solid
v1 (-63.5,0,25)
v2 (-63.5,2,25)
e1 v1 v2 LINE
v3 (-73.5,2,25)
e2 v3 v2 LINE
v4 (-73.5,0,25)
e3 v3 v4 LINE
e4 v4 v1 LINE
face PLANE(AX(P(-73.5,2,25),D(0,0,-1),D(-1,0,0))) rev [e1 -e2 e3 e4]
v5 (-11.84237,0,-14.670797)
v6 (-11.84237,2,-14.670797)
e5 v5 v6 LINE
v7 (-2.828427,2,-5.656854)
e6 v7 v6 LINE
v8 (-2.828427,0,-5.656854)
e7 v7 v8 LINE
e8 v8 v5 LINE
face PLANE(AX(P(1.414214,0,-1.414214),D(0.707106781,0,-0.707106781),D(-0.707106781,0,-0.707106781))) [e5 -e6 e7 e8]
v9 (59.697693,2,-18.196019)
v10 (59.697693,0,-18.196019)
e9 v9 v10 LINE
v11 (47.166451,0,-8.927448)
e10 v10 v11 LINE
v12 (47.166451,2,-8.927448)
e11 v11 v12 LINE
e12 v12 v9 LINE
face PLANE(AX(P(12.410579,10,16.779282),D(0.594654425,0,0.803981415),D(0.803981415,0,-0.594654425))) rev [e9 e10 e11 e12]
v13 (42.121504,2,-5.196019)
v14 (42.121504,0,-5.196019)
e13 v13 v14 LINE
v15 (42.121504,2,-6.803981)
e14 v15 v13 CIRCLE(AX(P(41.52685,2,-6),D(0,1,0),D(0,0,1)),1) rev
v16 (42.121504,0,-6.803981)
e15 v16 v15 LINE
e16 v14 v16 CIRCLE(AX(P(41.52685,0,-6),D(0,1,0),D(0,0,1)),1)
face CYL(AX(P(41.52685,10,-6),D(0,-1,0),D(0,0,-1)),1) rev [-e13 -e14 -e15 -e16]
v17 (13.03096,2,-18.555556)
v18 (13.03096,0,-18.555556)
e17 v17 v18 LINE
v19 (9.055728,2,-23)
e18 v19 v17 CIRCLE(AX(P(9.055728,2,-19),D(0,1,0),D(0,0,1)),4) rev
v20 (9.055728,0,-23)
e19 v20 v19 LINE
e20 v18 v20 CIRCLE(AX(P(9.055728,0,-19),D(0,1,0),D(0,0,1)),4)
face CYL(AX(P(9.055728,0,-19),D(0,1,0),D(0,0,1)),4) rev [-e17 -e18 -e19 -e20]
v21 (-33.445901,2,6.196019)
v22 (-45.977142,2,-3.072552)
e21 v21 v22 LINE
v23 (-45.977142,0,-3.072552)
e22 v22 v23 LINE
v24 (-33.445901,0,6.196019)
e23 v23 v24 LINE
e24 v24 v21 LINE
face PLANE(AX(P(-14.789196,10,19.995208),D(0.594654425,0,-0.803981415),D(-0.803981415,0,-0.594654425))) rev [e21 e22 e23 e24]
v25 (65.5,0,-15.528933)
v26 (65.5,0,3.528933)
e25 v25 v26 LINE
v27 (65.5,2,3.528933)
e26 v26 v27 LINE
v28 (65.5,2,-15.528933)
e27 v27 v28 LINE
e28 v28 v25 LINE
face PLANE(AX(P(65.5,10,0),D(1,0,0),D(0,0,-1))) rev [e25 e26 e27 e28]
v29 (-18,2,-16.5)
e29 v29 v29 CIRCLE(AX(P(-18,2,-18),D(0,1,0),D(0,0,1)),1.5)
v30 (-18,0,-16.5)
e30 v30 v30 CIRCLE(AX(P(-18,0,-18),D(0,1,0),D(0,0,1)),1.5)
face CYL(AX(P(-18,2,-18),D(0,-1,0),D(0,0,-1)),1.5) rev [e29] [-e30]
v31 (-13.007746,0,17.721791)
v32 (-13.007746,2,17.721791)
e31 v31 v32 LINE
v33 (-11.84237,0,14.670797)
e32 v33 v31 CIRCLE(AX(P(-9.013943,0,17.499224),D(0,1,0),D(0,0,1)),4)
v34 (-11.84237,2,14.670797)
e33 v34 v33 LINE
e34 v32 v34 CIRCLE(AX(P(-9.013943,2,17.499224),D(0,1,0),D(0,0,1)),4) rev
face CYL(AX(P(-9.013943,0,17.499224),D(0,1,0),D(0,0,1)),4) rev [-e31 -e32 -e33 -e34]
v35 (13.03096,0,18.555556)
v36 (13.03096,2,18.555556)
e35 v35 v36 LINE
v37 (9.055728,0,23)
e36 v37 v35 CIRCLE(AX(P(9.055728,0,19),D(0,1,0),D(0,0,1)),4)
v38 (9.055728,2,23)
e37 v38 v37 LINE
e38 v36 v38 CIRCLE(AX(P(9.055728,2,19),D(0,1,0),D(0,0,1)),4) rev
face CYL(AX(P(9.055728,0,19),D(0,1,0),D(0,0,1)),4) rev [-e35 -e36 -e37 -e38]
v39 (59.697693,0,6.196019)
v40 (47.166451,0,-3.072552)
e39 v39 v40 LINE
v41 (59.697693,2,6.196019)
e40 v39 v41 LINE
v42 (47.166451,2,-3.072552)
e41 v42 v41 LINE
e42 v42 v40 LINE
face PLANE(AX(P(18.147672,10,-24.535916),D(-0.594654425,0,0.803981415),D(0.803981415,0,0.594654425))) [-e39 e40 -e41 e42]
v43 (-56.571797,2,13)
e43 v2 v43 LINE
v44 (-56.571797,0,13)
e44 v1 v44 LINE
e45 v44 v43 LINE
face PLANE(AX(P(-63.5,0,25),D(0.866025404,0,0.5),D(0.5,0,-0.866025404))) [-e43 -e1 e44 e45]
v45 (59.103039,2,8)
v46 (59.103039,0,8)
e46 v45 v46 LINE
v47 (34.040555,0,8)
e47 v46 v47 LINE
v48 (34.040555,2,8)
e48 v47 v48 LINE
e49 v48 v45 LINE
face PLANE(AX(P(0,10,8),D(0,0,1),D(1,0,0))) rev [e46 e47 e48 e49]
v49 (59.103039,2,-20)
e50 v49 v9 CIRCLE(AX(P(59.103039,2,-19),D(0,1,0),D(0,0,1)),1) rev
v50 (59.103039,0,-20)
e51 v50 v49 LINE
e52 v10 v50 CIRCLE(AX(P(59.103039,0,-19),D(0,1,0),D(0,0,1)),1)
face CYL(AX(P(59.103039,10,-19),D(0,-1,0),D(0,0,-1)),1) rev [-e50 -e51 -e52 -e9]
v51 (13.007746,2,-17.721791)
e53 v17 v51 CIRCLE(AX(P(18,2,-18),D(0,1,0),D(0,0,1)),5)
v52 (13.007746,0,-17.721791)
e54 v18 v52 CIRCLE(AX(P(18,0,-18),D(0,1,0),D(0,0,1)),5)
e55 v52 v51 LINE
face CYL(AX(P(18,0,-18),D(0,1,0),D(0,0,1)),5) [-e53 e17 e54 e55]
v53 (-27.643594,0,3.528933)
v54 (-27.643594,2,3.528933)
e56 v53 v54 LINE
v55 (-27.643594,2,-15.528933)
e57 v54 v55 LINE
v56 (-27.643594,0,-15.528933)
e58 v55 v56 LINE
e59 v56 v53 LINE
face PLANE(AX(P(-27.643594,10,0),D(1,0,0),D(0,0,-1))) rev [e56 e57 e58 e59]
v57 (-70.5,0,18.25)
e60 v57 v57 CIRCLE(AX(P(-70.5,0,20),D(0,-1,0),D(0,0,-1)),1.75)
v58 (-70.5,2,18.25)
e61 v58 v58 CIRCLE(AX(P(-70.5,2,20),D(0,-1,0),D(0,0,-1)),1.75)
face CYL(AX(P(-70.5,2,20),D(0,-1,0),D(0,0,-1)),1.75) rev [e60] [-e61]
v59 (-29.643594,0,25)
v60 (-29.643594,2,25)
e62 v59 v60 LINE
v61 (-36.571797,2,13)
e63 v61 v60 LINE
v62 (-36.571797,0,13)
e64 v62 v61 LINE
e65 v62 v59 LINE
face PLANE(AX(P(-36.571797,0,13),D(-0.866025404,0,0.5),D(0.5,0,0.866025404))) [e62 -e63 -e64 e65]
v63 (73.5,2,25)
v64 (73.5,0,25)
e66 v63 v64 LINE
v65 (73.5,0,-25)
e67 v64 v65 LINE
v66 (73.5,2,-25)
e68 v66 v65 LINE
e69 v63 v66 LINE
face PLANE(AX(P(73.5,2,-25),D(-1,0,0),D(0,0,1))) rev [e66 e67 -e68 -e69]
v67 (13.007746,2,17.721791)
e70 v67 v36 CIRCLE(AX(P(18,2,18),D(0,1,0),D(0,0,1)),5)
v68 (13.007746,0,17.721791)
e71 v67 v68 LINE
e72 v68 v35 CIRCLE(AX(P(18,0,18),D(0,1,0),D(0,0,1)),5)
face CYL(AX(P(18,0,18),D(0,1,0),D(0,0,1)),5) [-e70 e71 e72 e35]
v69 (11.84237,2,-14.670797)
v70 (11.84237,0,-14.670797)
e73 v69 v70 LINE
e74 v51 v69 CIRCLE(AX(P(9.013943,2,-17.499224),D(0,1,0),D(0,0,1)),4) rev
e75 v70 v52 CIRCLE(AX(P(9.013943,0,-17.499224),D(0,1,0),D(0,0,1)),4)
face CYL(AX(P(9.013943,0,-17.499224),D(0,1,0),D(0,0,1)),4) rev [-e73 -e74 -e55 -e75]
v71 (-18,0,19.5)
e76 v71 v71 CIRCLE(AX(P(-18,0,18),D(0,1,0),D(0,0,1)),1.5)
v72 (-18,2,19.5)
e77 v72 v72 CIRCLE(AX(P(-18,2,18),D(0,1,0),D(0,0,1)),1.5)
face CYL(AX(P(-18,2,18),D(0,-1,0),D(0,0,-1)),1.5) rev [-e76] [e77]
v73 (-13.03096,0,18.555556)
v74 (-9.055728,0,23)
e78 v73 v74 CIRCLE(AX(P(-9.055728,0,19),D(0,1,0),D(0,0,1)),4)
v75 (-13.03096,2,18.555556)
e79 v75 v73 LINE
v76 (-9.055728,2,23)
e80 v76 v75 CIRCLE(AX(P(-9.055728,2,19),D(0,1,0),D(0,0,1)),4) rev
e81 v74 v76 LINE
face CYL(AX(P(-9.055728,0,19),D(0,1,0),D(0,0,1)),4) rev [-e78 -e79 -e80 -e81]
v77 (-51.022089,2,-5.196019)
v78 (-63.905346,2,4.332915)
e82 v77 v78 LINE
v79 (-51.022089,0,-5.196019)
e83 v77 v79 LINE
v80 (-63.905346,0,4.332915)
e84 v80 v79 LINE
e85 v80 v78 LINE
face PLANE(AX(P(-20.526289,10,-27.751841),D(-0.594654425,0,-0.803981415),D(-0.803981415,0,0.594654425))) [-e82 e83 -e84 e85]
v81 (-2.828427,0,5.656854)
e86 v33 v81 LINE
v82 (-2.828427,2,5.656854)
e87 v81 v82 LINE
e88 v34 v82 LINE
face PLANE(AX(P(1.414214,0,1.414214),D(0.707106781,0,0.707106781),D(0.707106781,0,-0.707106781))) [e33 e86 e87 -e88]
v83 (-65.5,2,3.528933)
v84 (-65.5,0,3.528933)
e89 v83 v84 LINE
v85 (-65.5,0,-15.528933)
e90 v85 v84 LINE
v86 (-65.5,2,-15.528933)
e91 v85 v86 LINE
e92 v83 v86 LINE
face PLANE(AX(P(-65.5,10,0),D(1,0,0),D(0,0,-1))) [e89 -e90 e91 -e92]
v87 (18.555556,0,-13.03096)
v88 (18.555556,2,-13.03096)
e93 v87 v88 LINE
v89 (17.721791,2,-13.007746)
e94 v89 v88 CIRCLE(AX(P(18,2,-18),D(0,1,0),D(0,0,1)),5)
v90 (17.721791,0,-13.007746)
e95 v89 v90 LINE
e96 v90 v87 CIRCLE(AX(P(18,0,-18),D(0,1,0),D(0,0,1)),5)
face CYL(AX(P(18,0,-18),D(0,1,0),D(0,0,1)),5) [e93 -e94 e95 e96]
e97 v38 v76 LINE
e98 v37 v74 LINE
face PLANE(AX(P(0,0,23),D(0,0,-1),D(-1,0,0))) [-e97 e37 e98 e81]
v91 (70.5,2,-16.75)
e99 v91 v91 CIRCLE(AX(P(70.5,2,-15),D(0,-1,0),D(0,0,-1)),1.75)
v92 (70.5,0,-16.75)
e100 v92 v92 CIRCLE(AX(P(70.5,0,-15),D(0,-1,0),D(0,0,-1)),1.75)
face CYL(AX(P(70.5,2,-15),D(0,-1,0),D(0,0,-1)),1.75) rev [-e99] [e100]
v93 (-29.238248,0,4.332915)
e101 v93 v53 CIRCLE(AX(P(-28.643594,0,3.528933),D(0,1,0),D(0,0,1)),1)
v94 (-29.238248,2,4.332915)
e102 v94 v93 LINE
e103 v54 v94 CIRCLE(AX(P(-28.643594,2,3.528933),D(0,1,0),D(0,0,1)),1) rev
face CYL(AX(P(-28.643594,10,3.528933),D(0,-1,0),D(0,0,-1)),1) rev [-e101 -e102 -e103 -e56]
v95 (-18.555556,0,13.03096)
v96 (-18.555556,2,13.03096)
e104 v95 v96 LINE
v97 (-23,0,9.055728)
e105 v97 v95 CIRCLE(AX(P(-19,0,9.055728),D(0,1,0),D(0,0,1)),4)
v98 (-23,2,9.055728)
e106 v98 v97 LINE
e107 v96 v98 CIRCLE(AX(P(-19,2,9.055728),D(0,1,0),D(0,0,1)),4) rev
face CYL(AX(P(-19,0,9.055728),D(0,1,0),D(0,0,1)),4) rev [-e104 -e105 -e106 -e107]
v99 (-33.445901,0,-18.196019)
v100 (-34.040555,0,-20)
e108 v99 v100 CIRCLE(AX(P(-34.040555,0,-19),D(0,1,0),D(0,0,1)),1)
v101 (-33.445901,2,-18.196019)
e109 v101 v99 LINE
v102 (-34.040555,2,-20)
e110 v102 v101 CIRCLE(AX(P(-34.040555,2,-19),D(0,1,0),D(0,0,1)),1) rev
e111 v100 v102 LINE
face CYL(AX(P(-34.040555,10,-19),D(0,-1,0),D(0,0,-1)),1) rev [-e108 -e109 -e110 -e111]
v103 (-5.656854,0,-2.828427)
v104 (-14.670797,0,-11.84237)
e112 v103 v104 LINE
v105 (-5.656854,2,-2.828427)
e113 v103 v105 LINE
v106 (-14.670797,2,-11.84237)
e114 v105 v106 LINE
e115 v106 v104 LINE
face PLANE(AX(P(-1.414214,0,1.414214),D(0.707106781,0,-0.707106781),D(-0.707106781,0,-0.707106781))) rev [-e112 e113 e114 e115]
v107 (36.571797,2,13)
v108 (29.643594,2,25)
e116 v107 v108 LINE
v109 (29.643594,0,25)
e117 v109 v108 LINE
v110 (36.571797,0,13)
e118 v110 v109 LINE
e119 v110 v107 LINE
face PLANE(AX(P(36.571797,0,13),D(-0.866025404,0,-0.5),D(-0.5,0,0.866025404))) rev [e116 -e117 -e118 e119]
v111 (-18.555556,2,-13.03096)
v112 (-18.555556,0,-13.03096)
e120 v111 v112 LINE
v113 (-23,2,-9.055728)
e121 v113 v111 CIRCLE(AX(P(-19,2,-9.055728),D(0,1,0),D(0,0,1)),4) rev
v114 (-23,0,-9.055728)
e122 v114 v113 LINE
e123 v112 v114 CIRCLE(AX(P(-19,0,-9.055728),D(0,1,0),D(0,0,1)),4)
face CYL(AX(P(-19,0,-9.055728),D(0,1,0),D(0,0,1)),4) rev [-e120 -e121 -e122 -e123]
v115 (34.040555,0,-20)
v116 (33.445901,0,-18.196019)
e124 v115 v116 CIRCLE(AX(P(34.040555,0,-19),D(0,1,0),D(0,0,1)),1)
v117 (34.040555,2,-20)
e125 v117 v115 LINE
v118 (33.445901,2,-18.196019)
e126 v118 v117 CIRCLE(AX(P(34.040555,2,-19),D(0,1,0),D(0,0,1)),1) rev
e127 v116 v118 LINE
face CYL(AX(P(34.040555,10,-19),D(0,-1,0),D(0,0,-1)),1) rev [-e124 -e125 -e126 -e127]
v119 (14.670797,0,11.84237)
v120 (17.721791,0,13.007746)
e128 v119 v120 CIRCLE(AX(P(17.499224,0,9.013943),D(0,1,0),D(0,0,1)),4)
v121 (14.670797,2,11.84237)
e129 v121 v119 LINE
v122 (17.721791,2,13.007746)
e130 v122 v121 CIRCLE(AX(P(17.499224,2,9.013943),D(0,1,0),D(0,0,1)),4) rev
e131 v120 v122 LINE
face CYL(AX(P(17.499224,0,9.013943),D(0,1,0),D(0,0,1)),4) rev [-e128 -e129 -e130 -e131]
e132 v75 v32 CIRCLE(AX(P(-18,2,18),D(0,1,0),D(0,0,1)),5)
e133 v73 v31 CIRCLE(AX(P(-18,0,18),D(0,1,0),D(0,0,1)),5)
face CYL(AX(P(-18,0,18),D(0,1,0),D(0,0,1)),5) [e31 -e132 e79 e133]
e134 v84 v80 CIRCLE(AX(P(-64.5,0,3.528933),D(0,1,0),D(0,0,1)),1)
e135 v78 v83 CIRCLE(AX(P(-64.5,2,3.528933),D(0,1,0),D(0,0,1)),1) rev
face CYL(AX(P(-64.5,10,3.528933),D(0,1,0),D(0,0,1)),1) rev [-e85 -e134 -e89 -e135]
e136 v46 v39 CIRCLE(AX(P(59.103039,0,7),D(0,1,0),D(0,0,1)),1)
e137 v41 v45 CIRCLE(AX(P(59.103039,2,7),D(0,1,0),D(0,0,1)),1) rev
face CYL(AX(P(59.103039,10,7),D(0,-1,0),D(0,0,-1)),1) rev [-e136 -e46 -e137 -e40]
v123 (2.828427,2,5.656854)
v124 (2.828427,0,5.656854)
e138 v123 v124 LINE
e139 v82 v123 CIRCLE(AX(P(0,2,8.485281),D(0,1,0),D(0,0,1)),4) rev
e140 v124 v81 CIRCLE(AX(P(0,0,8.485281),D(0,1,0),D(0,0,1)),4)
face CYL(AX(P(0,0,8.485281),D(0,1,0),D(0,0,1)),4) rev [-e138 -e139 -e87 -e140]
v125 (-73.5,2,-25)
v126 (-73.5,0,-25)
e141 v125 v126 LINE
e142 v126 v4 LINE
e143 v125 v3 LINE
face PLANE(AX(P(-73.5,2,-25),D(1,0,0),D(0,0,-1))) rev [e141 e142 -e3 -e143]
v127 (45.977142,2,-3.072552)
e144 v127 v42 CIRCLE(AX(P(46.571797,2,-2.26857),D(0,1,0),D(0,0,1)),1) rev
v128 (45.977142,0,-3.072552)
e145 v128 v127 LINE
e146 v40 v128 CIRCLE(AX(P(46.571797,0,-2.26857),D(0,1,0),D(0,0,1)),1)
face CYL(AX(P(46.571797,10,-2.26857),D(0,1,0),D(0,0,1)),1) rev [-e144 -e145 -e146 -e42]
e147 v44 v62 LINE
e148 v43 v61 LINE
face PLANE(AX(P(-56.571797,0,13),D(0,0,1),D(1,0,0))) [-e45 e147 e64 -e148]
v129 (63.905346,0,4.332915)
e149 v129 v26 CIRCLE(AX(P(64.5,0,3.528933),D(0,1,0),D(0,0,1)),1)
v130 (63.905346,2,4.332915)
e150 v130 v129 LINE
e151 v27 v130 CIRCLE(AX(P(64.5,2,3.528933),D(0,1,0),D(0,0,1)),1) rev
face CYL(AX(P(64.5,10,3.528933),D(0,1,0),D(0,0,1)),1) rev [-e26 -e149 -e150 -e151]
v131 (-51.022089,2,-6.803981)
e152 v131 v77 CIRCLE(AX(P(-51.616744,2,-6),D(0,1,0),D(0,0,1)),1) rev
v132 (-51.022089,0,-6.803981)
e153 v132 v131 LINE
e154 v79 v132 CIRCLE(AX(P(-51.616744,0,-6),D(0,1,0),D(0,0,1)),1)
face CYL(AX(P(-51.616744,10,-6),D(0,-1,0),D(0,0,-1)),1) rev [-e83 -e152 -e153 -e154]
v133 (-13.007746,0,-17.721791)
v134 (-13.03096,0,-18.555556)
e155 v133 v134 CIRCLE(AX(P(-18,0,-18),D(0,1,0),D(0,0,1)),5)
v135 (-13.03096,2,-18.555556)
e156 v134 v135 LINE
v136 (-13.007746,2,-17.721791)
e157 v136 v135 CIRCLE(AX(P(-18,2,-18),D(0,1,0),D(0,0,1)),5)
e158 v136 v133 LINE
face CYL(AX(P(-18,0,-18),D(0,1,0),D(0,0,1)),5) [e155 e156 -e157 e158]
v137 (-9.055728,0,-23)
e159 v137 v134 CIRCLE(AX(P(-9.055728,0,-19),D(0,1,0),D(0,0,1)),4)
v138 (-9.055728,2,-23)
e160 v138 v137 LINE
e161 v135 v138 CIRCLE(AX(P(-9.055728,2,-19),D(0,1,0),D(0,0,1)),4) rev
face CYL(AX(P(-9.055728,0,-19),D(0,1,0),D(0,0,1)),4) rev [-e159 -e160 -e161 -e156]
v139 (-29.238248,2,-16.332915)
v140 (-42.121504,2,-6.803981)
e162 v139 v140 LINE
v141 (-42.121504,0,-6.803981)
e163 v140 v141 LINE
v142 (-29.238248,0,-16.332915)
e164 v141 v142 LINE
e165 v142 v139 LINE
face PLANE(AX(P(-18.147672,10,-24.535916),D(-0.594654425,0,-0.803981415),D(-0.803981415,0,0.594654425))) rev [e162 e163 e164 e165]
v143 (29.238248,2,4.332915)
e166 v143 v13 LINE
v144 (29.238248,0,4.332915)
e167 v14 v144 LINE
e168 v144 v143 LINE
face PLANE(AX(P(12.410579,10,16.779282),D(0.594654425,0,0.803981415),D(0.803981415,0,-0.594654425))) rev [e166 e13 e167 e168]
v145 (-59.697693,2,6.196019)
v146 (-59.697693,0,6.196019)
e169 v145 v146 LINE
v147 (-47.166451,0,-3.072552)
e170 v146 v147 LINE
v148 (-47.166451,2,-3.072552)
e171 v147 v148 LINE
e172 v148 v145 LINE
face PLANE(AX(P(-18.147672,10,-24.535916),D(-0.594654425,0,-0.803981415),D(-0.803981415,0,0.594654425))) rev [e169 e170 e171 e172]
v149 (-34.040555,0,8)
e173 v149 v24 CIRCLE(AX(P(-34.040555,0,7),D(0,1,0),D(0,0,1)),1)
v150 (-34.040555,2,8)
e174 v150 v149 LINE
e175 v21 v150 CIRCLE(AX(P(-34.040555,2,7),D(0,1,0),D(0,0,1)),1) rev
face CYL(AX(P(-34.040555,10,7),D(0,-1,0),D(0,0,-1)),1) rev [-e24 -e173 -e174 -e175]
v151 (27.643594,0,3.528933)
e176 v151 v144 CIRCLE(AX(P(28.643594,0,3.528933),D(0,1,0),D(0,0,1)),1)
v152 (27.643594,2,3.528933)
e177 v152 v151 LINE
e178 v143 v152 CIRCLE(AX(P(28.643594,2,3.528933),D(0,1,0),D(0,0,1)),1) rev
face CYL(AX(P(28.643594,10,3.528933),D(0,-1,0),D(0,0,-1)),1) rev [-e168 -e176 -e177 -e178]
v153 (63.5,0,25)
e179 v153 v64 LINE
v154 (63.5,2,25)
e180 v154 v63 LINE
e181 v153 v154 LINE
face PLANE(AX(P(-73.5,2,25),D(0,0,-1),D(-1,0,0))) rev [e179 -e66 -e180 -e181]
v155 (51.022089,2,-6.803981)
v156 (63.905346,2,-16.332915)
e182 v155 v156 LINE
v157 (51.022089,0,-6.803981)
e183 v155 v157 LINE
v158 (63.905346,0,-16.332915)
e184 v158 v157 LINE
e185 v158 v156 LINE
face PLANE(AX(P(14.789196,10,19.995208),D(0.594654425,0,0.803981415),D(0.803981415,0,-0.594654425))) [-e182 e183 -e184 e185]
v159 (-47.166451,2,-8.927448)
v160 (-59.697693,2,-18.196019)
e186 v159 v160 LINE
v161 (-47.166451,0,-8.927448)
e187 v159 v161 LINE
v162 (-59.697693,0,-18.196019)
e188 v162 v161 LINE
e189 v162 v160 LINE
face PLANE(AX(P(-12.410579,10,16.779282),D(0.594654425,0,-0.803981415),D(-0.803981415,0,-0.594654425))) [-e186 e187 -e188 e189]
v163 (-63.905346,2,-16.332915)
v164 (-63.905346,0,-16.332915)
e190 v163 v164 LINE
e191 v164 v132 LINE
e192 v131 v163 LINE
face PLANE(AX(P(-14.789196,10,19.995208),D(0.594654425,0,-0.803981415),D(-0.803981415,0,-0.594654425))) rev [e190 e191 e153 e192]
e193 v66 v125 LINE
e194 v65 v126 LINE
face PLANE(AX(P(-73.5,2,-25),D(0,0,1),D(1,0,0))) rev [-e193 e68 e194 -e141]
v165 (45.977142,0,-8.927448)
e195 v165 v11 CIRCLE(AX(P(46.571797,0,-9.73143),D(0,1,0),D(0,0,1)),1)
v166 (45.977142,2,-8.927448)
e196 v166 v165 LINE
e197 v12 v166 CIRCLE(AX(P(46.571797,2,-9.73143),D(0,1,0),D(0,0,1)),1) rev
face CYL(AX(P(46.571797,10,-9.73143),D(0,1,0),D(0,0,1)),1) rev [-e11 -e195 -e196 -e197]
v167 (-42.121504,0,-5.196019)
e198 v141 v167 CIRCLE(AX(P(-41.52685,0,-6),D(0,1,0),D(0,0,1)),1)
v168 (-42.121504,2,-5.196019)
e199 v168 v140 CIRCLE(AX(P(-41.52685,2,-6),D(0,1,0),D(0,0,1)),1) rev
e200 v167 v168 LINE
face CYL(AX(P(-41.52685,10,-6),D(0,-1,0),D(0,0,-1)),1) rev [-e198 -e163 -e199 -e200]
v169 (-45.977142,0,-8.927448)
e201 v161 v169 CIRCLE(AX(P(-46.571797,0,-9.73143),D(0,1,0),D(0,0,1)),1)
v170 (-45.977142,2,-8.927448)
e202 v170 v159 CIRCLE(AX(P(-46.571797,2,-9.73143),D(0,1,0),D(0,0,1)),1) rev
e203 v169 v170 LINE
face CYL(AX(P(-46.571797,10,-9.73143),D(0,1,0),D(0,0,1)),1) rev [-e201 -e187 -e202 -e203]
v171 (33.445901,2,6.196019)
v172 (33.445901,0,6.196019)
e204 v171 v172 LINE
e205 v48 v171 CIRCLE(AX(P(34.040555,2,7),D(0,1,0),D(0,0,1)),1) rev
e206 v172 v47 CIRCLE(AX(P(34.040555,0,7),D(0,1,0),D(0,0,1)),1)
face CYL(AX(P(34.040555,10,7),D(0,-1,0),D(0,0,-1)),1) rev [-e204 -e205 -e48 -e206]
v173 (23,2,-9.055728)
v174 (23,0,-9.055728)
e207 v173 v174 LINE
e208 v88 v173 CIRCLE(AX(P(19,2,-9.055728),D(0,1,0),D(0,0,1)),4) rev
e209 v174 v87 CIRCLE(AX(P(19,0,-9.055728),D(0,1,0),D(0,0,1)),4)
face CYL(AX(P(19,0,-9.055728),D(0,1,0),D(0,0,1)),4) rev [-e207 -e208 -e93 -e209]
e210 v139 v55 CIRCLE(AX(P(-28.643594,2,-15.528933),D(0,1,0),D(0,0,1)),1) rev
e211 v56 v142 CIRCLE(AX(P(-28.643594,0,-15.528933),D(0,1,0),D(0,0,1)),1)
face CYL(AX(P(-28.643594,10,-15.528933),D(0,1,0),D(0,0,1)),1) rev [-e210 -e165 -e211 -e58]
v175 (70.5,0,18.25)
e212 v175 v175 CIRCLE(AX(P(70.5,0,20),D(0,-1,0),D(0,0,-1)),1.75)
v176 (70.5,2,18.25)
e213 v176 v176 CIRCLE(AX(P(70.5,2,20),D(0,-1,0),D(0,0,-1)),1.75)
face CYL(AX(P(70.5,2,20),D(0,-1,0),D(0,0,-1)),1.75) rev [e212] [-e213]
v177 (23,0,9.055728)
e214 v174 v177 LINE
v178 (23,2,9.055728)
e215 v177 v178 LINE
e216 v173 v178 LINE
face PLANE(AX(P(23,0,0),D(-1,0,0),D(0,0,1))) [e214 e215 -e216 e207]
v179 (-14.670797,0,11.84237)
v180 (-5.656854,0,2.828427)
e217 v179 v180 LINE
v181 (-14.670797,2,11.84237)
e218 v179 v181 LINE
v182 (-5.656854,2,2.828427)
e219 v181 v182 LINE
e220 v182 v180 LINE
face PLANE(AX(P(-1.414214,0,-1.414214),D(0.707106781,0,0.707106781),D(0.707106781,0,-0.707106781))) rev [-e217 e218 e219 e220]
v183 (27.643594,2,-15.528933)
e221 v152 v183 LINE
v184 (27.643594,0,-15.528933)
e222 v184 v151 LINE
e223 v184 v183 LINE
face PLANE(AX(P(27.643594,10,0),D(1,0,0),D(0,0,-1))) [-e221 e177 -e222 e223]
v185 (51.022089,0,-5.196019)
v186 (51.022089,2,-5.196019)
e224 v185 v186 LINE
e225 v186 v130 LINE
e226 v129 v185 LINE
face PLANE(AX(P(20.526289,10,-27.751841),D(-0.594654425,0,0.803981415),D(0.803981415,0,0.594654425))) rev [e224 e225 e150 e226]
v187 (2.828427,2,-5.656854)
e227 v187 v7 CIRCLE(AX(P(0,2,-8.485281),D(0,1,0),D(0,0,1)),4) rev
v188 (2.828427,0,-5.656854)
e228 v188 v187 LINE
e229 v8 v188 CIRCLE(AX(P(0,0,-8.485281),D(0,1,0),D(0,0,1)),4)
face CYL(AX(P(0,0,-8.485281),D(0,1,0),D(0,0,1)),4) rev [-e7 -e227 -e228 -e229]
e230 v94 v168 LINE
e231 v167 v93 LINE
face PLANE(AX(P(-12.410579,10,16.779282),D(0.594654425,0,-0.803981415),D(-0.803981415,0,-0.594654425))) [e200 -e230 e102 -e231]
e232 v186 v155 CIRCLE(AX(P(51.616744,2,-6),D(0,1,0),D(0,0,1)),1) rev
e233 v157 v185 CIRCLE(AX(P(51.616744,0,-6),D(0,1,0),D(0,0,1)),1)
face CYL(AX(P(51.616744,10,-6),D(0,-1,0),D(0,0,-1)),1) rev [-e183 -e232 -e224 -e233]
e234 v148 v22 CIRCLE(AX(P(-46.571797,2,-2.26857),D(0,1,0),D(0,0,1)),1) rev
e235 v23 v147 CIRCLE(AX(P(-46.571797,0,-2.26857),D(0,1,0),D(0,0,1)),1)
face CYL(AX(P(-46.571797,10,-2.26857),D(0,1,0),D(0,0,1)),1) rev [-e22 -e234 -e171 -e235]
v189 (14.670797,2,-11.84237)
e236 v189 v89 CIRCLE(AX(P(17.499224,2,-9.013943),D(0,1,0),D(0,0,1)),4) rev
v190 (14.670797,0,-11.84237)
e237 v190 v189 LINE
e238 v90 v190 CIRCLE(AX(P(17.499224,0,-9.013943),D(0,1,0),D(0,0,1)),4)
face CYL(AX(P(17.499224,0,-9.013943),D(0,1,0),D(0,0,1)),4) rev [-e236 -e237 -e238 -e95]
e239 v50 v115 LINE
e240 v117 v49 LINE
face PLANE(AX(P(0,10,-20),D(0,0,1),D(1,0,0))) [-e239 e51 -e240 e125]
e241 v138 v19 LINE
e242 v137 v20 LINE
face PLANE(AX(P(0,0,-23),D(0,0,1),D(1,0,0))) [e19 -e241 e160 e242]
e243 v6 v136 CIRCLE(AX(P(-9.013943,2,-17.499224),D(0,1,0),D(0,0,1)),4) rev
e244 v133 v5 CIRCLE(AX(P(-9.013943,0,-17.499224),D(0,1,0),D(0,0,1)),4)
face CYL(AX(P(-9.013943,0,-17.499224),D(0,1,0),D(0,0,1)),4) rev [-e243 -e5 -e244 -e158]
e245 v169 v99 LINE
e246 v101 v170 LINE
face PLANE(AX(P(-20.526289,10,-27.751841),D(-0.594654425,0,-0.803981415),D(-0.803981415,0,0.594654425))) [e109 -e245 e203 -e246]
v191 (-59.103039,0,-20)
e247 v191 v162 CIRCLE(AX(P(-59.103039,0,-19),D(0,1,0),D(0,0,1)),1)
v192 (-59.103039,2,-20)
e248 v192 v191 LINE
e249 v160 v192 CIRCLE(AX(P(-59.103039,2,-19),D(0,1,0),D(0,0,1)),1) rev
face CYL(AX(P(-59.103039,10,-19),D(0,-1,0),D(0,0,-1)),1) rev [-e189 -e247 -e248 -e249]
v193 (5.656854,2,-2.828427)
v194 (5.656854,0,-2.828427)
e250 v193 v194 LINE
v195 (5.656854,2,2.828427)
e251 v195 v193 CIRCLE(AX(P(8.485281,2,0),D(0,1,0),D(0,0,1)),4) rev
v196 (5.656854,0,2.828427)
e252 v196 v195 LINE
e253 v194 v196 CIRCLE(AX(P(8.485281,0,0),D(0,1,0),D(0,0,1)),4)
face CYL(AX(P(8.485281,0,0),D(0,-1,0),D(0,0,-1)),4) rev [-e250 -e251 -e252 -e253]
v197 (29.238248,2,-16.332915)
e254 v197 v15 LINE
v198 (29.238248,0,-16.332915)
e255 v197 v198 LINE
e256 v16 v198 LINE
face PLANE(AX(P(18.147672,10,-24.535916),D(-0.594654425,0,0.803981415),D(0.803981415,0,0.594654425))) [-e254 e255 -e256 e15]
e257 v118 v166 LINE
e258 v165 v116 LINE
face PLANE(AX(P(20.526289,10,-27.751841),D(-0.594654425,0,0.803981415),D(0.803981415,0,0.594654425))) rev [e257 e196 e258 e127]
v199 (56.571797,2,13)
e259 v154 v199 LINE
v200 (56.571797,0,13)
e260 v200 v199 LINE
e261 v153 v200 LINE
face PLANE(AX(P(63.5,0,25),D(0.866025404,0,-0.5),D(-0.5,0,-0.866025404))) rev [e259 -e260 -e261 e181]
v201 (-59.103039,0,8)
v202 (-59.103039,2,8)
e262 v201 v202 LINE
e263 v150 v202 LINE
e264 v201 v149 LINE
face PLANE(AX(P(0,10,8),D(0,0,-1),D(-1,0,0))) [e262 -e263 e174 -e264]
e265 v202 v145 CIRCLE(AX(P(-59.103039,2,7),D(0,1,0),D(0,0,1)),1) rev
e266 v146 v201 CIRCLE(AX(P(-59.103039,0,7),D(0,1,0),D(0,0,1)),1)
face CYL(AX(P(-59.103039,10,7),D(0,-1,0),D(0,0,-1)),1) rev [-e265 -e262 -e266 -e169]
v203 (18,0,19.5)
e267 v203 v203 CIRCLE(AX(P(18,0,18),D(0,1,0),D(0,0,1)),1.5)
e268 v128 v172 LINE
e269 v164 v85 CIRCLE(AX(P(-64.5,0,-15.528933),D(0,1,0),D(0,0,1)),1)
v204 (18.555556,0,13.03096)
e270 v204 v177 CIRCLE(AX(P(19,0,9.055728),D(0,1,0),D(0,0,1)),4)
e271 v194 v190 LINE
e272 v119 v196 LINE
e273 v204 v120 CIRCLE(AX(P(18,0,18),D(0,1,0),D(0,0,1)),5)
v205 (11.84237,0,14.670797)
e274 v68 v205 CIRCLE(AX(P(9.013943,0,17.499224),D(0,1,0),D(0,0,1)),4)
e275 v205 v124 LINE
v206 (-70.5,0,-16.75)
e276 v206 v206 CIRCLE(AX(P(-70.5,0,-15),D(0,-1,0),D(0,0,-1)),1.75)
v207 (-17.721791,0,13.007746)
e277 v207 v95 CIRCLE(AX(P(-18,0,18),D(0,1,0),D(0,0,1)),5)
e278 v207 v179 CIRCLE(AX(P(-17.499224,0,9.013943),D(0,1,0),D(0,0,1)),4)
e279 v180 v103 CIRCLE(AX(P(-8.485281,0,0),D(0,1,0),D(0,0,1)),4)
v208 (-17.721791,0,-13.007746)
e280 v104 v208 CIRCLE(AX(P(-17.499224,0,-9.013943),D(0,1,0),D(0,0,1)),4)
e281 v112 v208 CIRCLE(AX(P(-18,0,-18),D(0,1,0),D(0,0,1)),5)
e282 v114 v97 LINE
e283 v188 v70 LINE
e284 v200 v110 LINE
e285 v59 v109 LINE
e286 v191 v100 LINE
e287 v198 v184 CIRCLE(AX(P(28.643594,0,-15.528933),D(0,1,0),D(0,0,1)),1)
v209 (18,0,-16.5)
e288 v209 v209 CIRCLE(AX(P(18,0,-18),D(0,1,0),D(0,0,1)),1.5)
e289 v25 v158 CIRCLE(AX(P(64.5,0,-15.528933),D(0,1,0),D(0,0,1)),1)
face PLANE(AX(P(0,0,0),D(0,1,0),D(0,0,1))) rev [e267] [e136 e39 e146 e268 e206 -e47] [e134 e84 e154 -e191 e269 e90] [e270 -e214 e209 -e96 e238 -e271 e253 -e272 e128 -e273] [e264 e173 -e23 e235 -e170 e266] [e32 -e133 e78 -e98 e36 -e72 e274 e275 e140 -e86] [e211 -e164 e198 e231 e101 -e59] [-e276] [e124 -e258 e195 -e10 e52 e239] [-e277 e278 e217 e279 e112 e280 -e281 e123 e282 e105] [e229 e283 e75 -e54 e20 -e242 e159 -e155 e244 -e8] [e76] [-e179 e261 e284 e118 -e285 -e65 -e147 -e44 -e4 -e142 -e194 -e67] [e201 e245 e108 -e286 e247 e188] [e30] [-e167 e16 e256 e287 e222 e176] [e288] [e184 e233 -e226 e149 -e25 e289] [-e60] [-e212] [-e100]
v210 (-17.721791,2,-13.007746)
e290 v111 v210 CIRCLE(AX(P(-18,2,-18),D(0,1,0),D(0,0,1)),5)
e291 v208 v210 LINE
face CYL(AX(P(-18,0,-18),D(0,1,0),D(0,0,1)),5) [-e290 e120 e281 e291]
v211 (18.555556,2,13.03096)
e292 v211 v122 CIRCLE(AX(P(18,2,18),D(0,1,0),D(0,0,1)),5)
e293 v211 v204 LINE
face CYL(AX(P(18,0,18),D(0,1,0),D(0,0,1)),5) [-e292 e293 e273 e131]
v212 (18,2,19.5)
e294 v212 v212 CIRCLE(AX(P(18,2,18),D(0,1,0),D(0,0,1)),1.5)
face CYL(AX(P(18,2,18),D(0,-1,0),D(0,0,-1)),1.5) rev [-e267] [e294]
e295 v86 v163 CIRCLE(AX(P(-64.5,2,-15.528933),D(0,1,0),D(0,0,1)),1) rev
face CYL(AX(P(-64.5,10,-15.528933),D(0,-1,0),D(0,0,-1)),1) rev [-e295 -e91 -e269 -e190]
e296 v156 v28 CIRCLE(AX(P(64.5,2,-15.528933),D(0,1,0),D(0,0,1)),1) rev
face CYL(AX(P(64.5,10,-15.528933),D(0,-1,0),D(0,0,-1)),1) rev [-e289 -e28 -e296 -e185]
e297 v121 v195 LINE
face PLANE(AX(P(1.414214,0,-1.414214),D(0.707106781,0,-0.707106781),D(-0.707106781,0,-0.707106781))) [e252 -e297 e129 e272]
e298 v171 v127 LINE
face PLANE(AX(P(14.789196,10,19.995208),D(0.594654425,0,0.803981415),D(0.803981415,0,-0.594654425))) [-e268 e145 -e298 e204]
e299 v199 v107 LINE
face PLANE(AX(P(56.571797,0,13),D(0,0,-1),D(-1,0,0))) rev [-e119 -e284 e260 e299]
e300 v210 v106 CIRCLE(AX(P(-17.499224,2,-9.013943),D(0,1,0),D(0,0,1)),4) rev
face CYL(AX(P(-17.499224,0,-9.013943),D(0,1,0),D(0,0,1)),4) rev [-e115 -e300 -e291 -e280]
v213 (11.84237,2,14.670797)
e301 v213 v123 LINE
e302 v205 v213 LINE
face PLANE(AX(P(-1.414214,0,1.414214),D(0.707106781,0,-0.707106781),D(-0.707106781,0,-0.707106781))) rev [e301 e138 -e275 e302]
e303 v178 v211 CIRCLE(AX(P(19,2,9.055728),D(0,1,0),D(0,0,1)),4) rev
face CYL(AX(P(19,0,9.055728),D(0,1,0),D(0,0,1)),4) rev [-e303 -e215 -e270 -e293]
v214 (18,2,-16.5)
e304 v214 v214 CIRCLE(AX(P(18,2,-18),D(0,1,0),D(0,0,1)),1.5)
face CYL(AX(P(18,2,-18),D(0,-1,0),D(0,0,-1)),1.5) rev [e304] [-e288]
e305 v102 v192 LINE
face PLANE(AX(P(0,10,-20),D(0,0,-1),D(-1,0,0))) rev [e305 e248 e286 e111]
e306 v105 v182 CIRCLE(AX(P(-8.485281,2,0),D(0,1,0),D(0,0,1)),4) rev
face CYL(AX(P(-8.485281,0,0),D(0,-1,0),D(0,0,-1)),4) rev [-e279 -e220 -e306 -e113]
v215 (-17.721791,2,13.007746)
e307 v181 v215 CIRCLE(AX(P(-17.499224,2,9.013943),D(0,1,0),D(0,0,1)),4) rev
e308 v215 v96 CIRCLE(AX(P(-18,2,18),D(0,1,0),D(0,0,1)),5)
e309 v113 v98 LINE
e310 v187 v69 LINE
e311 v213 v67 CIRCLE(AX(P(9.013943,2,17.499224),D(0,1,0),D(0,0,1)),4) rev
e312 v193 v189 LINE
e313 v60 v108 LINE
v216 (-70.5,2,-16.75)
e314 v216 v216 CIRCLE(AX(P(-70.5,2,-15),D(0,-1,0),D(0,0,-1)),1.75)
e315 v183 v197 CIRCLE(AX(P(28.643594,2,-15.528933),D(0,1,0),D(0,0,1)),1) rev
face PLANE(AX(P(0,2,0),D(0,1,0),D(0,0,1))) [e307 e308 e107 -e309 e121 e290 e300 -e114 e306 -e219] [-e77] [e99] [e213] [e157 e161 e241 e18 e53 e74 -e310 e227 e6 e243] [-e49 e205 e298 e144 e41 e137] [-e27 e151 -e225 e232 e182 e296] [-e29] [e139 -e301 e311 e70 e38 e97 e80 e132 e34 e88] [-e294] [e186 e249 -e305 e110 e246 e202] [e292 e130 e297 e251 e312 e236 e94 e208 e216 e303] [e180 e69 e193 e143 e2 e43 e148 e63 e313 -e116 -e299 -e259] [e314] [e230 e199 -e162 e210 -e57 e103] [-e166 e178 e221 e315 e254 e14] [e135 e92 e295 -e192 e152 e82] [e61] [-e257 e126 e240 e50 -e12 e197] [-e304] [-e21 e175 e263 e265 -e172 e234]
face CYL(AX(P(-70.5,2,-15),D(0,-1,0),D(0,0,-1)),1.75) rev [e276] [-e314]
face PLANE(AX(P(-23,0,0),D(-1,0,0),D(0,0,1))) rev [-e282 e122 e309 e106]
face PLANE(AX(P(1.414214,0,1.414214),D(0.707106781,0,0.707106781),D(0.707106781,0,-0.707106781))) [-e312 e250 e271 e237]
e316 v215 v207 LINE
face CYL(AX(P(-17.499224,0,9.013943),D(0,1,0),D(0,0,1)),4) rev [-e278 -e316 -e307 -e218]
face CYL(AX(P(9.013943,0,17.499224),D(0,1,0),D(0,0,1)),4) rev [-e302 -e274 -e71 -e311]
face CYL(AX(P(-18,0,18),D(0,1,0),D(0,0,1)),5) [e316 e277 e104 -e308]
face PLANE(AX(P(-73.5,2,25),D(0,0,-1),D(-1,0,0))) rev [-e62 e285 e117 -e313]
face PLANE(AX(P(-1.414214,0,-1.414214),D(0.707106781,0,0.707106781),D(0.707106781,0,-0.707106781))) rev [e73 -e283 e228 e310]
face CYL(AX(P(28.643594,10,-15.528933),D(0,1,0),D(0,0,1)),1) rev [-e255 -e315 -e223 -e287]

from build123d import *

# Parameters (mm, degrees)
SKETCH_1_W          = 147
SKETCH_1_H          = 50
SKETCH_1_R          = 1.5
EXTRUDE_1_DEPTH     = 2
CUT_EXTRUDE_1_DEPTH = 2
FILLET_2_DEPTH      = 2
FILLET_3_R          = 4
CUT_EXTRUDE_3_DEPTH = 78.661122835
SKETCH_7_R          = 1.75
CUT_EXTRUDE_4_DEPTH = 78.661122835
CUT_EXTRUDE_5_DEPTH = 10
FILLET_4_R          = 1


with BuildPart() as part:
    # 草图1 → 凸台-拉伸1 (new body)
    with BuildSketch(Plane(origin=(0, 0, 0), x_dir=(1, 0, 0), z_dir=(0, 1, 0))):
        Rectangle(SKETCH_1_W, SKETCH_1_H)
        with Locations(Location((18, -18, 0), (0, 0, 270))):
            Circle(SKETCH_1_R, mode=Mode.SUBTRACT)
        with Locations(Location((-18, -18, 0), (0, 0, 270))):
            Circle(SKETCH_1_R, mode=Mode.SUBTRACT)
        with Locations(Location((-18, 18, 0), (0, 0, 270))):
            Circle(SKETCH_1_R, mode=Mode.SUBTRACT)
        with Locations(Location((18, 18, 0), (0, 0, 270))):
            Circle(SKETCH_1_R, mode=Mode.SUBTRACT)
    extrude(amount=EXTRUDE_1_DEPTH)

    # 草图3 → 切除-拉伸1 (cut)
    with BuildSketch(Plane(origin=(0, 2, 0), x_dir=(1, 0, 0), z_dir=(0, 1, 0))):
        with BuildLine():
            Line((-13.345416088, 16.173843213), (0, 2.828427125))
            Line((0, 2.828427125), (13.345416088, 16.173843213))
            ThreePointArc((13.345416088, 16.173843213), (13.868972045, 20.816843629), (18, 23))
            Line((18, 23), (-18, 23))
            ThreePointArc((-18, 23), (-14.464466094, 21.535533906), (-13, 18))
            ThreePointArc((-13, 18), (-13.087112888, 17.070731352), (-13.345416088, 16.173843213))
        make_face()
        with BuildLine():
            Line((16.173843213, 13.345416088), (2.828427125, 0))
            Line((2.828427125, 0), (16.173843213, -13.345416088))
            ThreePointArc((16.173843213, -13.345416088), (20.816843629, -13.868972045), (23, -18))
            Line((23, -18), (23, 18))
            ThreePointArc((23, 18), (20.816843629, 13.868972045), (16.173843213, 13.345416088))
        make_face()
        with BuildLine():
            Line((0, -2.828427125), (-13.345416088, -16.173843213))
            ThreePointArc((-13.345416088, -16.173843213), (-13.087112888, -17.070731352), (-13, -18))
            ThreePointArc((-13, -18), (-14.464466094, -21.535533906), (-18, -23))
            Line((-18, -23), (18, -23))
            ThreePointArc((18, -23), (13.868972045, -20.816843629), (13.345416088, -16.173843213))
            Line((13.345416088, -16.173843213), (0, -2.828427125))
        make_face()
        with BuildLine():
            ThreePointArc((-23, -18), (-20.816843629, -13.868972045), (-16.173843213, -13.345416088))
            Line((-16.173843213, -13.345416088), (-2.828427125, 0))
            Line((-2.828427125, 0), (-16.173843213, 13.345416088))
            ThreePointArc((-16.173843213, 13.345416088), (-20.816843629, 13.868972045), (-23, 18))
            Line((-23, 18), (-23, -18))
        make_face()
    extrude(amount=-CUT_EXTRUDE_1_DEPTH, mode=Mode.SUBTRACT)

    # 圆角2: read off the stored shape, not the designer's step
    # 圆角2 outline → 圆角2 (add)
    with BuildSketch(Plane(origin=(0, 0, 0), x_dir=(1, 0, 0), z_dir=(0, 1, 0))):
        with BuildLine():
            Line((-23, 18), (-23, 9.05572809))
            ThreePointArc((-23, 9.05572809), (-21.666666667, 12.03715206), (-18.555555556, 13.03096005))
            ThreePointArc((-18.555555556, 13.03096005), (-21.726779962, 14.666666667), (-23, 18))
        make_face()
        with BuildLine():
            ThreePointArc((-18.555555556, -13.03096005), (-21.666666667, -12.03715206), (-23, -9.05572809))
            Line((-23, -9.05572809), (-23, -18))
            ThreePointArc((-23, -18), (-21.726779962, -14.666666667), (-18.555555556, -13.03096005))
        make_face()
        with BuildLine():
            ThreePointArc((13.03096005, -18.555555556), (12.03715206, -21.666666667), (9.05572809, -23))
            Line((9.05572809, -23), (18, -23))
            ThreePointArc((18, -23), (14.666666667, -21.726779962), (13.03096005, -18.555555556))
        make_face()
        with BuildLine():
            ThreePointArc((-9.05572809, -23), (-12.03715206, -21.666666667), (-13.03096005, -18.555555556))
            ThreePointArc((-13.03096005, -18.555555556), (-14.666666667, -21.726779962), (-18, -23))
            Line((-18, -23), (-9.05572809, -23))
        make_face()
        with BuildLine():
            ThreePointArc((18.555555556, 13.03096005), (21.666666667, 12.03715206), (23, 9.05572809))
            Line((23, 9.05572809), (23, 18))
            ThreePointArc((23, 18), (21.726779962, 14.666666667), (18.555555556, 13.03096005))
        make_face()
        with BuildLine():
            ThreePointArc((23, -9.05572809), (21.666666667, -12.03715206), (18.555555556, -13.03096005))
            ThreePointArc((18.555555556, -13.03096005), (21.726779962, -14.666666667), (23, -18))
            Line((23, -18), (23, -9.05572809))
        make_face()
        with BuildLine():
            ThreePointArc((-13.03096005, 18.555555556), (-12.03715206, 21.666666667), (-9.05572809, 23))
            Line((-9.05572809, 23), (-18, 23))
            ThreePointArc((-18, 23), (-14.666666667, 21.726779962), (-13.03096005, 18.555555556))
        make_face()
        with BuildLine():
            ThreePointArc((9.05572809, 23), (12.03715206, 21.666666667), (13.03096005, 18.555555556))
            ThreePointArc((13.03096005, 18.555555556), (14.666666667, 21.726779962), (18, 23))
            Line((18, 23), (9.05572809, 23))
        make_face()
    extrude(amount=FILLET_2_DEPTH)

    # 圆角3
    fillet_3_edges = [part.edges().sort_by_distance(p)[0] for p in [
        (13.345416088, 1, 16.173843213),
        (-13.345416088, 1, 16.173843213),
        (0, 1, 2.828427125),
        (16.173843213, 1, -13.345416088),
        (16.173843213, 1, 13.345416088),
        (2.828427125, 1, 0),
        (-16.173843213, 1, -13.345416088),
        (-2.828427125, 1, 0),
        (-16.173843213, 1, 13.345416088),
        (-13.345416088, 1, -16.173843213),
        (13.345416088, 1, -16.173843213),
        (0, 1, -2.828427125),
    ]]
    fillet(fillet_3_edges, radius=FILLET_3_R)

    # 草图6 → 切除-拉伸3 (cut, through all)
    with BuildSketch(Plane(origin=(0, 2, 0), x_dir=(1, 0, 0), z_dir=(0, 1, 0))):
        Polygon((63.5, -25), (56.57179677, -13), (36.57179677, -13), (29.643593539, -25), align=None)
    cut_extrude_3 = extrude(amount=-CUT_EXTRUDE_3_DEPTH, mode=Mode.SUBTRACT)

    # 镜向1: 切除-拉伸3 across plane
    add(cut_extrude_3.mirror(Plane(origin=(0, 0, 0), x_dir=(0, 0, 1), z_dir=(1, 0, 0))), mode=Mode.SUBTRACT)

    # 草图7 → 切除-拉伸4 (cut, through all)
    with BuildSketch(Plane.XZ):
        with Locations(Location((70.5, 20, 0), (0, 0, 270))):
            Circle(SKETCH_7_R)
        with Locations(Location((70.5, -15, 0), (0, 0, 270))):
            Circle(SKETCH_7_R)
        with Locations(Location((-70.5, -15, 0), (0, 0, 270))):
            Circle(SKETCH_7_R)
        with Locations(Location((-70.5, 20, 0), (0, 0, 270))):
            Circle(SKETCH_7_R)
    extrude(amount=-CUT_EXTRUDE_4_DEPTH, mode=Mode.SUBTRACT)

    # 草图8 → 切除-拉伸5 (cut)
    with BuildSketch(Plane.XZ):
        Polygon((-62.136702063, 8), (-46.57179677, -3.512380307), (-31.006891476, 8), align=None)
        Polygon((-27.643593539, 5.512380307), (-43.208498833, -6), (-27.643593539, -17.512380307), align=None)
        Polygon((-46.57179677, -8.487619693), (-62.136702063, -20), (-31.006891476, -20), align=None)
        Polygon((-65.5, 5.512380307), (-65.5, -17.512380307), (-49.935094706, -6), align=None)
        Polygon((27.643593539, -17.512380307), (43.208498833, -6), (27.643593539, 5.512380307), align=None)
        Polygon((31.006891476, 8), (46.57179677, -3.512380307), (62.136702063, 8), align=None)
        Polygon((49.935094706, -6), (65.5, -17.512380307), (65.5, 5.512380307), align=None)
        Polygon((62.136702063, -20), (46.57179677, -8.487619693), (31.006891476, -20), align=None)
    extrude(amount=-CUT_EXTRUDE_5_DEPTH, mode=Mode.SUBTRACT)

    # 圆角4
    fillet_4_edges = [part.edges().sort_by_distance(p)[0] for p in [
        (27.643593539, 1, -17.512380307),
        (27.643593539, 1, 5.512380307),
        (43.208498833, 1, -6),
        (-65.5, 1, -17.512380307),
        (-65.5, 1, 5.512380307),
        (-49.935094706, 1, -6),
        (-43.208498833, 1, -6),
        (-27.643593539, 1, 5.512380307),
        (-27.643593539, 1, -17.512380307),
        (-62.136702063, 1, -20),
        (-46.57179677, 1, -8.487619693),
        (-31.006891476, 1, -20),
        (62.136702063, 1, -20),
        (31.006891476, 1, -20),
        (46.57179677, 1, -8.487619693),
        (62.136702063, 1, 8),
        (46.57179677, 1, -3.512380307),
        (31.006891476, 1, 8),
        (65.5, 1, -17.512380307),
        (49.935094706, 1, -6),
        (65.5, 1, 5.512380307),
        (-46.57179677, 1, -3.512380307),
        (-62.136702063, 1, 8),
        (-31.006891476, 1, 8),
    ]]
    fillet(fillet_4_edges, radius=FILLET_4_R)


solid = part.part
